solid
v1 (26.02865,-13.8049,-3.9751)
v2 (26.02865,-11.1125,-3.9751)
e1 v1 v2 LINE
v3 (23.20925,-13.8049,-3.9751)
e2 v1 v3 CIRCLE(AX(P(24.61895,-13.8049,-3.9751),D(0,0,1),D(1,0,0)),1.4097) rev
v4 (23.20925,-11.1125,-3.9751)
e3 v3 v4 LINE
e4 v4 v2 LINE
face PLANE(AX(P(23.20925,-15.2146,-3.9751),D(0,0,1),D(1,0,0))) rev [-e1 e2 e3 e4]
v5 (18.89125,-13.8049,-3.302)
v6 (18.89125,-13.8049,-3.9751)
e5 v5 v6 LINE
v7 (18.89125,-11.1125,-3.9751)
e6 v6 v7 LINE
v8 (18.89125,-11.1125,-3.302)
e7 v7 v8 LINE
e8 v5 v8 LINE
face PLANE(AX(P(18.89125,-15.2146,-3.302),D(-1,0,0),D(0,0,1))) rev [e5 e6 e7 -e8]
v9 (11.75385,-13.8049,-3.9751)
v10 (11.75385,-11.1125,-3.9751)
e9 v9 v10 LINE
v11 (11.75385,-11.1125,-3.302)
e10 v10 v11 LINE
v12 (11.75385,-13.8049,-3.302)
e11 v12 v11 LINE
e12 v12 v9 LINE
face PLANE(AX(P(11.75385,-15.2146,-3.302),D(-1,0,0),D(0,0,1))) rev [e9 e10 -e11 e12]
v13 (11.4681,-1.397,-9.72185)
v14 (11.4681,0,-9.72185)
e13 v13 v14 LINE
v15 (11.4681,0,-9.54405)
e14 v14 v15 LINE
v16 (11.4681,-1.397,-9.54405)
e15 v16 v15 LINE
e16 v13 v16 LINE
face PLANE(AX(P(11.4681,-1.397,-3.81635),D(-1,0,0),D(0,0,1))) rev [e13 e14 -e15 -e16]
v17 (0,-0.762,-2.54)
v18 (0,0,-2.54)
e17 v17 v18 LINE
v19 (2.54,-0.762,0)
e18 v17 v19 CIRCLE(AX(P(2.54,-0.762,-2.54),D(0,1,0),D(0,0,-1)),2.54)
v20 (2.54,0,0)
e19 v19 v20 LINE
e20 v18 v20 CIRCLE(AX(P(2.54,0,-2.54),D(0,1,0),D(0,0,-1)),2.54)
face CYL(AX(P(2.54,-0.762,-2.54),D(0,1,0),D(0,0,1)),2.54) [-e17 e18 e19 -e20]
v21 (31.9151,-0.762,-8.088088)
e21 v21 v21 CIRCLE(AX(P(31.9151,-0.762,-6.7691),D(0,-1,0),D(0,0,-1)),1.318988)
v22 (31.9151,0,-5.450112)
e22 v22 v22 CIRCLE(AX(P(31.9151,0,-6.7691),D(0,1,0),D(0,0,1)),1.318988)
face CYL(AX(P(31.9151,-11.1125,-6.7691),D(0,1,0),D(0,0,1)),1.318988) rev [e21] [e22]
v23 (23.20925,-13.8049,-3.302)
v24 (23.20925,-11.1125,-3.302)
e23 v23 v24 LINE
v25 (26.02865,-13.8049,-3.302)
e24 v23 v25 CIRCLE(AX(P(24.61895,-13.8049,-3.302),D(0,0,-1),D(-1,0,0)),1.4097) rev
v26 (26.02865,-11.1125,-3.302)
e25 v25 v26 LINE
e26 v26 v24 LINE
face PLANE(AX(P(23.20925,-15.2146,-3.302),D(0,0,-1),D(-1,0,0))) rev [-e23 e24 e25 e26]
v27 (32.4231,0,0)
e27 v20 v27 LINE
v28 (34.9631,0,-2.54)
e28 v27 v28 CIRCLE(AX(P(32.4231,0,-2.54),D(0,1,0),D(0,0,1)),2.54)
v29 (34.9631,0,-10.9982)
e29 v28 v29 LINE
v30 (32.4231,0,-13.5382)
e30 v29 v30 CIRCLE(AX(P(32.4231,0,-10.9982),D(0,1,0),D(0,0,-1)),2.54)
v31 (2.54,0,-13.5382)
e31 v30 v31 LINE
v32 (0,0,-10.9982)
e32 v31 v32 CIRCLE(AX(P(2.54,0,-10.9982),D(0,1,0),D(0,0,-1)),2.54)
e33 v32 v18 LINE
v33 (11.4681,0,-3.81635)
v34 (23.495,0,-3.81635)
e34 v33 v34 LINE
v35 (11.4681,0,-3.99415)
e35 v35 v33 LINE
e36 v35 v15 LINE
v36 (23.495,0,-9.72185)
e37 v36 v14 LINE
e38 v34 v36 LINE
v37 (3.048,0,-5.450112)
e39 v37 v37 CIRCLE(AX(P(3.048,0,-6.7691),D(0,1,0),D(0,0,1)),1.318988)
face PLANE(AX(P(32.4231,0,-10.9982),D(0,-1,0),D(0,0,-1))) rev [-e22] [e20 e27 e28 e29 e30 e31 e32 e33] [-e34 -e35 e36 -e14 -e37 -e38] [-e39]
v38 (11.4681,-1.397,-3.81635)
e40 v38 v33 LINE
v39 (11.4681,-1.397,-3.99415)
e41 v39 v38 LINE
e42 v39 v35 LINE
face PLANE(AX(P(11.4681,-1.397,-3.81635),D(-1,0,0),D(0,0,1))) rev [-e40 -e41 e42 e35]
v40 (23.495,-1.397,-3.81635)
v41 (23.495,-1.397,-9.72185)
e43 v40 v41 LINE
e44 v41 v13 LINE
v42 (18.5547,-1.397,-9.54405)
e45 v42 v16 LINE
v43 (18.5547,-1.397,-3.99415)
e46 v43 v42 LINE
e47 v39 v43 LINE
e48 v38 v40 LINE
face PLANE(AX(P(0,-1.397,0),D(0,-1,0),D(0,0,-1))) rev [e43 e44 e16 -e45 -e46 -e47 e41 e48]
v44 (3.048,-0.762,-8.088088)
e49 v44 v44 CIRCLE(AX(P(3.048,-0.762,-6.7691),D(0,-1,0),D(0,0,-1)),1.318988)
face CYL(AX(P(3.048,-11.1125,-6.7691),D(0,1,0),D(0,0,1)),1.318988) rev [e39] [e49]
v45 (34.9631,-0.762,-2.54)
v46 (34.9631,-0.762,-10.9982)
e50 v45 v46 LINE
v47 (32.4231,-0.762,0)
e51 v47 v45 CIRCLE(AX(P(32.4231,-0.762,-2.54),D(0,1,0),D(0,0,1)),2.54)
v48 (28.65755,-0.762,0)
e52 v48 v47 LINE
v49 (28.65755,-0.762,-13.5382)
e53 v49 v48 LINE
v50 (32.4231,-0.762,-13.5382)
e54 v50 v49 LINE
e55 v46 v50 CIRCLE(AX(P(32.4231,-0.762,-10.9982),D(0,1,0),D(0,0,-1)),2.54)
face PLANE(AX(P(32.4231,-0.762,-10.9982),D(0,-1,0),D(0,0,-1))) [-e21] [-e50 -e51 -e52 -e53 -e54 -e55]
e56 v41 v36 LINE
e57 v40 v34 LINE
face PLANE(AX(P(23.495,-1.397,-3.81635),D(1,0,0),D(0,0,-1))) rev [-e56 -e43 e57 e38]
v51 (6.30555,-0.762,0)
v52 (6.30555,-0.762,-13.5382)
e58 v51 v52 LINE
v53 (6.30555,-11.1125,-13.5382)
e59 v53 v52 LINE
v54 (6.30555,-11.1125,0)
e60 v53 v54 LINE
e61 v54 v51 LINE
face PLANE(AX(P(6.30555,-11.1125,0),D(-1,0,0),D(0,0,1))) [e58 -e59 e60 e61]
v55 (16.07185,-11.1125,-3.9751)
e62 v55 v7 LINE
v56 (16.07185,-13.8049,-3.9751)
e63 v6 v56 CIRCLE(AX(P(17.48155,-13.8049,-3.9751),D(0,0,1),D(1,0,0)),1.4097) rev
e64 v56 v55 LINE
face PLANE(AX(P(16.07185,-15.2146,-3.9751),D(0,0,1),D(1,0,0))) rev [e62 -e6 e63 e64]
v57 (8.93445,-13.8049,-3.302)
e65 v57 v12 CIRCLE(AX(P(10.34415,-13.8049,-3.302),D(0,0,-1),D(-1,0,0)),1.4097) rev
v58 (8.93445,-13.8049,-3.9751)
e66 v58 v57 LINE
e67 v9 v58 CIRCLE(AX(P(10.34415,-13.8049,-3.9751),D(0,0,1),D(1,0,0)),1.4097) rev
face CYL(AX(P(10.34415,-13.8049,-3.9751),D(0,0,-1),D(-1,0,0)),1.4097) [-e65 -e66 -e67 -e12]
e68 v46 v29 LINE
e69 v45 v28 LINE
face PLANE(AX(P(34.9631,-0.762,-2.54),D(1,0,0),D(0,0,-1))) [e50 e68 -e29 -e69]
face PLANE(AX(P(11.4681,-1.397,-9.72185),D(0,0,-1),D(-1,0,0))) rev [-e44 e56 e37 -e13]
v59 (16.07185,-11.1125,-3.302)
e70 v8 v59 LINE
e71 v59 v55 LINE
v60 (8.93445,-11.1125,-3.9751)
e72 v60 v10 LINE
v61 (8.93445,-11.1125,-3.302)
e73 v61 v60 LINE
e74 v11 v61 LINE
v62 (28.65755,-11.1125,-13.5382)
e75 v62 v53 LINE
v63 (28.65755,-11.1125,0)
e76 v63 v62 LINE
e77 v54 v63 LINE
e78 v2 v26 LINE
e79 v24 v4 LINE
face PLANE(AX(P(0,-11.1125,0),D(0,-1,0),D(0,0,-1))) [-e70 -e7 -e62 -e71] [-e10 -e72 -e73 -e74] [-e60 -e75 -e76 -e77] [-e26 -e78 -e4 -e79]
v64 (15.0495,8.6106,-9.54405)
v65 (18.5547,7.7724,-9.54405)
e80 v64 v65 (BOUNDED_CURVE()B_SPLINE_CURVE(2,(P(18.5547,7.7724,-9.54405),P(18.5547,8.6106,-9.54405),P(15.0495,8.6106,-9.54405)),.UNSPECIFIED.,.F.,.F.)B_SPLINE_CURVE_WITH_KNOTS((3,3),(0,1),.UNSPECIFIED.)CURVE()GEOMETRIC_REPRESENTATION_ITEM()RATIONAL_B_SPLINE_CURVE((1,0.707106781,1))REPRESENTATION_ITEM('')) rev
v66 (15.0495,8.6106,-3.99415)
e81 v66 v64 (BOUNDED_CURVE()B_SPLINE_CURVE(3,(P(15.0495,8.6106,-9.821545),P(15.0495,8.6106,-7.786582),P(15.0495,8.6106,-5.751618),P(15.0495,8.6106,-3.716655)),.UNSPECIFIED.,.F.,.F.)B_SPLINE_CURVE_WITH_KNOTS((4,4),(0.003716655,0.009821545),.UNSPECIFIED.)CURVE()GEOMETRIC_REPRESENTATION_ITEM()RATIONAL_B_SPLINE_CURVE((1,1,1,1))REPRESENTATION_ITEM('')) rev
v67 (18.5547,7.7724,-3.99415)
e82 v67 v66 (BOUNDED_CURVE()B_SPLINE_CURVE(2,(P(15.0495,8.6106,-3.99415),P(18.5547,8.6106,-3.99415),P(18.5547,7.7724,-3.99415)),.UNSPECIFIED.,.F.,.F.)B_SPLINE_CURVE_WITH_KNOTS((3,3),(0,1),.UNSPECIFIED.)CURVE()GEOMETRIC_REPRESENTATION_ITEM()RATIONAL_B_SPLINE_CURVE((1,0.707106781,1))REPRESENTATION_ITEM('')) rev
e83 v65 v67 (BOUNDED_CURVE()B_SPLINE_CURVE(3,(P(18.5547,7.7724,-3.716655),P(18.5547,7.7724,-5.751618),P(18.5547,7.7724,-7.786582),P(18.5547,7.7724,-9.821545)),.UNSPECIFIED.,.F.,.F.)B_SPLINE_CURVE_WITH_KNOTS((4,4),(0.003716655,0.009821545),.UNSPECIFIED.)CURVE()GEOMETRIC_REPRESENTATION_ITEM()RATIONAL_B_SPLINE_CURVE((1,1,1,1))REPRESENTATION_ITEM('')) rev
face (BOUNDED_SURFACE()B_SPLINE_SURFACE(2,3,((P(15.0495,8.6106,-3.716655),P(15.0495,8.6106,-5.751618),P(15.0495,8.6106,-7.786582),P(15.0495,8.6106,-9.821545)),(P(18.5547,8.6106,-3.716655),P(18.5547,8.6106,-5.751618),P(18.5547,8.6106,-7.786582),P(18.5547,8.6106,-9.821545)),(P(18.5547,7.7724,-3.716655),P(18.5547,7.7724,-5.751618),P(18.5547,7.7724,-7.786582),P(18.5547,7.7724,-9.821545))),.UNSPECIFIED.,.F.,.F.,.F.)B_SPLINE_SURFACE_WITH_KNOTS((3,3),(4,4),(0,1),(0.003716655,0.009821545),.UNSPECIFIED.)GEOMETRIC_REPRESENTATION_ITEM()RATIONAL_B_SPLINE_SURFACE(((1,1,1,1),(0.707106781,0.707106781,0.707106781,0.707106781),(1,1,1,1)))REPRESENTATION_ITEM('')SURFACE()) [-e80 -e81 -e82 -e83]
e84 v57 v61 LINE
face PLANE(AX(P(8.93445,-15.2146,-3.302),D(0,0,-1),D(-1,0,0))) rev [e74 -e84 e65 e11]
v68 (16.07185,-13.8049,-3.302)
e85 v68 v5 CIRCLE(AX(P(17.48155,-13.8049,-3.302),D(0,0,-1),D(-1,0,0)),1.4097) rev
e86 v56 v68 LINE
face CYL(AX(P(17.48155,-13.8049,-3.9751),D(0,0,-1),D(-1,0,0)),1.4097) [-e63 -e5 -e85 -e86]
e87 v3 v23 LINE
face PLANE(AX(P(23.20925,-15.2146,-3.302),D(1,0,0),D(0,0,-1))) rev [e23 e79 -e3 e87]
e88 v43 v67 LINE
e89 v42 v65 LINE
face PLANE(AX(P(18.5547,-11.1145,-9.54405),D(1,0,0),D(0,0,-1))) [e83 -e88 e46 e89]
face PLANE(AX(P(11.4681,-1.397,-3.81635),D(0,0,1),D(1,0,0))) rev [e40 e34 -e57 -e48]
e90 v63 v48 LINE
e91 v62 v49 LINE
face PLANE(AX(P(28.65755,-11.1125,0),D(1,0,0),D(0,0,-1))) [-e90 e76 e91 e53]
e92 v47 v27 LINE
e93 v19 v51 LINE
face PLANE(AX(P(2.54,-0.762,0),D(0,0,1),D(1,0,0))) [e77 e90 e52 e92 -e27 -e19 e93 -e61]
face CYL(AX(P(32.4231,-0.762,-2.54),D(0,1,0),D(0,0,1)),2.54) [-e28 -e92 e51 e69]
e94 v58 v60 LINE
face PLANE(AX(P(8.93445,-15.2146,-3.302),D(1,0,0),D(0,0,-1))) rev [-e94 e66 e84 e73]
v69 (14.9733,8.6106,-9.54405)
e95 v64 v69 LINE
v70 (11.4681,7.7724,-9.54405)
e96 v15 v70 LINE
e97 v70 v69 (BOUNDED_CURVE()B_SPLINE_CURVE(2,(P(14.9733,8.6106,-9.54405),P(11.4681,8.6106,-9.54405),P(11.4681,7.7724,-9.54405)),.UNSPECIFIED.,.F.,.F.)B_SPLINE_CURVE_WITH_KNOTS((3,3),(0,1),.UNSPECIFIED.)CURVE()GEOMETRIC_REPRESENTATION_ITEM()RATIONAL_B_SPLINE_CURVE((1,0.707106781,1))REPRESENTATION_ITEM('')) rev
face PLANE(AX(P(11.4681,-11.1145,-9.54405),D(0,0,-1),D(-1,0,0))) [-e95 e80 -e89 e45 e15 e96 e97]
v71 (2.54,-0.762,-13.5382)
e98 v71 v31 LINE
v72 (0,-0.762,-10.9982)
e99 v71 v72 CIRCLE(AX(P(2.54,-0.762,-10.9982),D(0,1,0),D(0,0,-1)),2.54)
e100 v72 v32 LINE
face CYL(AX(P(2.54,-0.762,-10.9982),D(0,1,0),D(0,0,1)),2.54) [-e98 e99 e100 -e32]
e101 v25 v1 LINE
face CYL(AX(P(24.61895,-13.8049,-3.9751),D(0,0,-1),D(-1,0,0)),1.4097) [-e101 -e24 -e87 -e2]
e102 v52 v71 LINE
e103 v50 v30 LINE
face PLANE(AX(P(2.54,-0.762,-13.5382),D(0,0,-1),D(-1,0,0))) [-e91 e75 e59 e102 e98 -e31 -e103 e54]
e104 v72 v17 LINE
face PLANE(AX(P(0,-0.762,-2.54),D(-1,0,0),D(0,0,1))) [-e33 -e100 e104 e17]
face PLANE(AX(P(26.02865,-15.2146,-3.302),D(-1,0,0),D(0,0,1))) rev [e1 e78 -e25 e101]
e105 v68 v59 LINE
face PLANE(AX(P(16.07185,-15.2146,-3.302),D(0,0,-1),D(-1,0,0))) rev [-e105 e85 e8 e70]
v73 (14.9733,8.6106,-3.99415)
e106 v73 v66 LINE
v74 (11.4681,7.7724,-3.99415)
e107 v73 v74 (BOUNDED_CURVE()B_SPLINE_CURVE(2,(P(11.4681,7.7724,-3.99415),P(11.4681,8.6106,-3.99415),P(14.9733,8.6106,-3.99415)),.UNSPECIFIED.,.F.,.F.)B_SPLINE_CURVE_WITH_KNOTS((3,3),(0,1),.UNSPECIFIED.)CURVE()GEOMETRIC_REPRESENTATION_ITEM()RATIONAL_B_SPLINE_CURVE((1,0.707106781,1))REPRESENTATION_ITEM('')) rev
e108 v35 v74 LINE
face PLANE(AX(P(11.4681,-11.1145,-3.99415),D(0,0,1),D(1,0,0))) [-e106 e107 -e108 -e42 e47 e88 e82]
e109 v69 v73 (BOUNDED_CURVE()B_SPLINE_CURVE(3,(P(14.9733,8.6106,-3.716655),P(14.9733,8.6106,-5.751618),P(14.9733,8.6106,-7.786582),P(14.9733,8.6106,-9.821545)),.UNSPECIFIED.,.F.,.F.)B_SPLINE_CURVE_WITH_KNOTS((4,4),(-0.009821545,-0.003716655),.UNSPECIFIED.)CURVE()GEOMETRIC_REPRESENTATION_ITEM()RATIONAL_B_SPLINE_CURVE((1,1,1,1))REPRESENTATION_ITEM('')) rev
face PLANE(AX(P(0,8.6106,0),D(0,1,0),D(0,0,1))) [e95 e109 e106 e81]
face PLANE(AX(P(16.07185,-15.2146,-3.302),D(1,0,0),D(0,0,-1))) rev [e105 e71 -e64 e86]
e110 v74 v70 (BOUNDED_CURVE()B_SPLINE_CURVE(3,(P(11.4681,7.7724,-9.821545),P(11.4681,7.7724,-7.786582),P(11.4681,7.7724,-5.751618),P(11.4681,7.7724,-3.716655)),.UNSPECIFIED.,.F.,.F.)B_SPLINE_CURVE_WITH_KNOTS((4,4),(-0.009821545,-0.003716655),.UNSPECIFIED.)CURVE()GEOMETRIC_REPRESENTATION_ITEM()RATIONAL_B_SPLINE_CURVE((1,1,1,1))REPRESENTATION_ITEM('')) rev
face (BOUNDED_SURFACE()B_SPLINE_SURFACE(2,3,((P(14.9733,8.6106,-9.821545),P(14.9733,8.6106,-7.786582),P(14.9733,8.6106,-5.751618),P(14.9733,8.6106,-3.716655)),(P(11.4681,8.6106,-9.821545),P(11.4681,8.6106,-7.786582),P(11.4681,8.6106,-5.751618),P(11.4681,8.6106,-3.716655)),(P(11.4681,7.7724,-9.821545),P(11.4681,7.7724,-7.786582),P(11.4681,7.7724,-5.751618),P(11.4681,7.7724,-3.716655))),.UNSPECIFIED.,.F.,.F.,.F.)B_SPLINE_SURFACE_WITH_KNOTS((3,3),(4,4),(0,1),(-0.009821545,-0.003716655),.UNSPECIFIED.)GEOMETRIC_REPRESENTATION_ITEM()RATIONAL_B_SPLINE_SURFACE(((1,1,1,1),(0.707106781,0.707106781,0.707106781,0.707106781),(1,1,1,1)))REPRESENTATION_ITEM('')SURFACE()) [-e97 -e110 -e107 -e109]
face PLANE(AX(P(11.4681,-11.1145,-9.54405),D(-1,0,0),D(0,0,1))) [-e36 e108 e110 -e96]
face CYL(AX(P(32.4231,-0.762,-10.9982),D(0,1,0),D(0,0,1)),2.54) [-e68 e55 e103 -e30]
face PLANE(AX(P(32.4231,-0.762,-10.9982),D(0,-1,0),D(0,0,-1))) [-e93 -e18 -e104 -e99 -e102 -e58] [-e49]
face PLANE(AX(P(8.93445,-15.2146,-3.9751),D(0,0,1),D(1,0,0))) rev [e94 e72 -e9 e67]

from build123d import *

# Parameters (mm, degrees)
BOSS_EXTRUDE1_DEPTH             = 0.762
SKETCH2_W                       = 22.352
SKETCH2_H                       = 13.5382
BOSS_EXTRUDE2_DEPTH             = 11.1125
SKETCH6_W                       = 12.0269
SKETCH6_H                       = 5.9055
CUT_EXTRUDE2_DEPTH              = 1.397
SKETCH3_W                       = 7.0866
SKETCH3_H                       = 5.5499
BOSS_EXTRUDE3_DEPTH             = 8.6106
BOSS_EXTRUDE3_DIRECTION_2_REACH = 41.105
FILLET4_SIZE                    = 3.5052
FILLET4_SIZE_2                  = 0.8382
SKETCH4_R                       = 1.318988248
CUT_EXTRUDE1_DEPTH              = 40.104844676
SKETCH5_W                       = 2.8194
SKETCH5_H                       = 0.6731
BOSS_EXTRUDE4_DEPTH             = 4.1021
FILLET5_RADIUS                  = 1.4097
FILLET5_LENGTH                  = 0.6731
FILLET6_RADIUS                  = 1.4097
FILLET6_LENGTH                  = 0.6731
FILLET7_RADIUS                  = 1.4097
FILLET7_LENGTH                  = 0.6731


with BuildPart() as part:
    # Sketch1 → Boss-Extrude1 (new body)
    with BuildSketch(Plane(origin=(0, 0, 0), x_dir=(1, 0, 0), z_dir=(0, 1, 0))):
        with BuildLine():
            Line((2.54, 0), (32.4231, 0))
            ThreePointArc((32.4231, 0), (34.219151224, 0.743948776), (34.9631, 2.54))
            Line((34.9631, 2.54), (34.9631, 10.9982))
            ThreePointArc((34.9631, 10.9982), (34.219151224, 12.794251224), (32.4231, 13.5382))
            Line((32.4231, 13.5382), (2.54, 13.5382))
            ThreePointArc((2.54, 13.5382), (0.743948776, 12.794251224), (0, 10.9982))
            Line((0, 10.9982), (0, 2.54))
            ThreePointArc((0, 2.54), (0.743948776, 0.743948776), (2.54, 0))
        make_face()
    extrude(amount=-BOSS_EXTRUDE1_DEPTH)

    # Sketch2 → Boss-Extrude2 (add)
    with BuildSketch(Plane(origin=(0, 0, 0), x_dir=(1, 0, 0), z_dir=(0, 1, 0))):
        with Locations((17.48155, 6.7691)):
            Rectangle(SKETCH2_W, SKETCH2_H)
    extrude(amount=-BOSS_EXTRUDE2_DEPTH)

    # Sketch6 → Cut-Extrude2 (cut)
    with BuildSketch(Plane(origin=(0, 0, 0), x_dir=(1, 0, 0), z_dir=(0, 1, 0))):
        with Locations((17.48155, 6.7691)):
            Rectangle(SKETCH6_W, SKETCH6_H)
    extrude(amount=-CUT_EXTRUDE2_DEPTH, mode=Mode.SUBTRACT)

    # Sketch3 → Boss-Extrude3 (add)
    with BuildSketch(Plane(origin=(0, 0, 0), x_dir=(1, 0, 0), z_dir=(0, 1, 0))):
        with Locations((15.0114, 6.7691)):
            Rectangle(SKETCH3_W, SKETCH3_H)
    extrude(amount=BOSS_EXTRUDE3_DEPTH)

    # Sketch3 → Boss-Extrude3 direction 2 (add, up to next)
    with BuildSketch(Plane(origin=(0, 0, 0), x_dir=(1, 0, 0), z_dir=(0, 1, 0)), mode=Mode.PRIVATE) as boss_extrude3_direction_2_sk1:
        with Locations((15.0114, 6.7691)):
            Rectangle(SKETCH3_W, SKETCH3_H)
    boss_extrude3_direction_2_tool1 = extrude(boss_extrude3_direction_2_sk1.sketch, amount=-BOSS_EXTRUDE3_DIRECTION_2_REACH, mode=Mode.PRIVATE) - part.part
    add(boss_extrude3_direction_2_tool1.solids().sort_by_distance((15.0114, 0, -6.7691))[0])

    # Fillet4
    # an asymmetric fillet: 3.5052, 0.8382 mm, written as the material it takes off along each edge
    with BuildSketch(Plane(origin=(18.5547, 8.6106, -18.30705), x_dir=(-1, 0, 0), z_dir=(0, 0, 1))) as fillet4_piece_1:
        with BuildLine():
            Bezier((FILLET4_SIZE, 0), (0, 0), (0, FILLET4_SIZE_2), weights=[1, 0.707106781, 1])
            Line((0, FILLET4_SIZE_2), (0, 0))
            Line((0, 0), (FILLET4_SIZE, 0))
        make_face()
    extrude(amount=23.0759, mode=Mode.SUBTRACT)
    with BuildSketch(Plane(origin=(11.4681, 8.6106, 4.76885), x_dir=(0, -1, 0), z_dir=(0, 0, -1))) as fillet4_piece_2:
        with BuildLine():
            Bezier((FILLET4_SIZE_2, 0), (0, 0), (0, -FILLET4_SIZE), weights=[1, 0.707106781, 1])
            Line((0, -FILLET4_SIZE), (0, 0))
            Line((0, 0), (FILLET4_SIZE_2, 0))
        make_face()
    extrude(amount=23.0759, mode=Mode.SUBTRACT)

    # Sketch4 → Cut-Extrude1 (cut, through all)
    with BuildSketch(Plane(origin=(0, 0, 0), x_dir=(1, 0, 0), z_dir=(0, 1, 0))):
        with Locations(Location((3.048, 6.7691, 0), (0, 0, 270))):
            Circle(SKETCH4_R)
        with Locations(Location((31.9151, 6.7691, 0), (0, 0, 270))):
            Circle(SKETCH4_R)
    extrude(amount=-CUT_EXTRUDE1_DEPTH, mode=Mode.SUBTRACT)

    # Sketch5 → Boss-Extrude4 (add)
    with BuildSketch(Plane.XZ.offset(11.1125)):
        with Locations((10.34415, -3.63855)):
            Rectangle(SKETCH5_W, SKETCH5_H)
        with Locations((17.48155, -3.63855)):
            Rectangle(SKETCH5_W, SKETCH5_H)
        with Locations((24.61895, -3.63855)):
            Rectangle(SKETCH5_W, SKETCH5_H)
    extrude(amount=BOSS_EXTRUDE4_DEPTH)

    # Fillet5: full round fillet: the end face becomes a half cylinder, R = half its width
    fillet5_face = Plane((10.34415, -15.2146, -3.63855), x_dir=(0, 0, -1), z_dir=(0, -1, 0))  # on the end face: x along it, z out of the body
    fillet5_slab = fillet5_face.offset(-FILLET5_RADIUS / 2) * Box(FILLET5_LENGTH, 2 * FILLET5_RADIUS, FILLET5_RADIUS, mode=Mode.PRIVATE)  # the body's end, R deep
    fillet5_round = Plane((10.34415, -13.8049, -3.63855), x_dir=(0, -1, 0), z_dir=(0, 0, -1)) * Cylinder(FILLET5_RADIUS, FILLET5_LENGTH, mode=Mode.PRIVATE)  # its axis R under the face
    add(fillet5_slab - fillet5_round, mode=Mode.SUBTRACT)

    # Fillet6: full round fillet: the end face becomes a half cylinder, R = half its width
    fillet6_face = Plane((17.48155, -15.2146, -3.63855), x_dir=(0, 0, -1), z_dir=(0, -1, 0))  # on the end face: x along it, z out of the body
    fillet6_slab = fillet6_face.offset(-FILLET6_RADIUS / 2) * Box(FILLET6_LENGTH, 2 * FILLET6_RADIUS, FILLET6_RADIUS, mode=Mode.PRIVATE)  # the body's end, R deep
    fillet6_round = Plane((17.48155, -13.8049, -3.63855), x_dir=(0, -1, 0), z_dir=(0, 0, -1)) * Cylinder(FILLET6_RADIUS, FILLET6_LENGTH, mode=Mode.PRIVATE)  # its axis R under the face
    add(fillet6_slab - fillet6_round, mode=Mode.SUBTRACT)

    # Fillet7: full round fillet: the end face becomes a half cylinder, R = half its width
    fillet7_face = Plane((24.61895, -15.2146, -3.63855), x_dir=(0, 0, -1), z_dir=(0, -1, 0))  # on the end face: x along it, z out of the body
    fillet7_slab = fillet7_face.offset(-FILLET7_RADIUS / 2) * Box(FILLET7_LENGTH, 2 * FILLET7_RADIUS, FILLET7_RADIUS, mode=Mode.PRIVATE)  # the body's end, R deep
    fillet7_round = Plane((24.61895, -13.8049, -3.63855), x_dir=(0, -1, 0), z_dir=(0, 0, -1)) * Cylinder(FILLET7_RADIUS, FILLET7_LENGTH, mode=Mode.PRIVATE)  # its axis R under the face
    add(fillet7_slab - fillet7_round, mode=Mode.SUBTRACT)


solid = part.part
